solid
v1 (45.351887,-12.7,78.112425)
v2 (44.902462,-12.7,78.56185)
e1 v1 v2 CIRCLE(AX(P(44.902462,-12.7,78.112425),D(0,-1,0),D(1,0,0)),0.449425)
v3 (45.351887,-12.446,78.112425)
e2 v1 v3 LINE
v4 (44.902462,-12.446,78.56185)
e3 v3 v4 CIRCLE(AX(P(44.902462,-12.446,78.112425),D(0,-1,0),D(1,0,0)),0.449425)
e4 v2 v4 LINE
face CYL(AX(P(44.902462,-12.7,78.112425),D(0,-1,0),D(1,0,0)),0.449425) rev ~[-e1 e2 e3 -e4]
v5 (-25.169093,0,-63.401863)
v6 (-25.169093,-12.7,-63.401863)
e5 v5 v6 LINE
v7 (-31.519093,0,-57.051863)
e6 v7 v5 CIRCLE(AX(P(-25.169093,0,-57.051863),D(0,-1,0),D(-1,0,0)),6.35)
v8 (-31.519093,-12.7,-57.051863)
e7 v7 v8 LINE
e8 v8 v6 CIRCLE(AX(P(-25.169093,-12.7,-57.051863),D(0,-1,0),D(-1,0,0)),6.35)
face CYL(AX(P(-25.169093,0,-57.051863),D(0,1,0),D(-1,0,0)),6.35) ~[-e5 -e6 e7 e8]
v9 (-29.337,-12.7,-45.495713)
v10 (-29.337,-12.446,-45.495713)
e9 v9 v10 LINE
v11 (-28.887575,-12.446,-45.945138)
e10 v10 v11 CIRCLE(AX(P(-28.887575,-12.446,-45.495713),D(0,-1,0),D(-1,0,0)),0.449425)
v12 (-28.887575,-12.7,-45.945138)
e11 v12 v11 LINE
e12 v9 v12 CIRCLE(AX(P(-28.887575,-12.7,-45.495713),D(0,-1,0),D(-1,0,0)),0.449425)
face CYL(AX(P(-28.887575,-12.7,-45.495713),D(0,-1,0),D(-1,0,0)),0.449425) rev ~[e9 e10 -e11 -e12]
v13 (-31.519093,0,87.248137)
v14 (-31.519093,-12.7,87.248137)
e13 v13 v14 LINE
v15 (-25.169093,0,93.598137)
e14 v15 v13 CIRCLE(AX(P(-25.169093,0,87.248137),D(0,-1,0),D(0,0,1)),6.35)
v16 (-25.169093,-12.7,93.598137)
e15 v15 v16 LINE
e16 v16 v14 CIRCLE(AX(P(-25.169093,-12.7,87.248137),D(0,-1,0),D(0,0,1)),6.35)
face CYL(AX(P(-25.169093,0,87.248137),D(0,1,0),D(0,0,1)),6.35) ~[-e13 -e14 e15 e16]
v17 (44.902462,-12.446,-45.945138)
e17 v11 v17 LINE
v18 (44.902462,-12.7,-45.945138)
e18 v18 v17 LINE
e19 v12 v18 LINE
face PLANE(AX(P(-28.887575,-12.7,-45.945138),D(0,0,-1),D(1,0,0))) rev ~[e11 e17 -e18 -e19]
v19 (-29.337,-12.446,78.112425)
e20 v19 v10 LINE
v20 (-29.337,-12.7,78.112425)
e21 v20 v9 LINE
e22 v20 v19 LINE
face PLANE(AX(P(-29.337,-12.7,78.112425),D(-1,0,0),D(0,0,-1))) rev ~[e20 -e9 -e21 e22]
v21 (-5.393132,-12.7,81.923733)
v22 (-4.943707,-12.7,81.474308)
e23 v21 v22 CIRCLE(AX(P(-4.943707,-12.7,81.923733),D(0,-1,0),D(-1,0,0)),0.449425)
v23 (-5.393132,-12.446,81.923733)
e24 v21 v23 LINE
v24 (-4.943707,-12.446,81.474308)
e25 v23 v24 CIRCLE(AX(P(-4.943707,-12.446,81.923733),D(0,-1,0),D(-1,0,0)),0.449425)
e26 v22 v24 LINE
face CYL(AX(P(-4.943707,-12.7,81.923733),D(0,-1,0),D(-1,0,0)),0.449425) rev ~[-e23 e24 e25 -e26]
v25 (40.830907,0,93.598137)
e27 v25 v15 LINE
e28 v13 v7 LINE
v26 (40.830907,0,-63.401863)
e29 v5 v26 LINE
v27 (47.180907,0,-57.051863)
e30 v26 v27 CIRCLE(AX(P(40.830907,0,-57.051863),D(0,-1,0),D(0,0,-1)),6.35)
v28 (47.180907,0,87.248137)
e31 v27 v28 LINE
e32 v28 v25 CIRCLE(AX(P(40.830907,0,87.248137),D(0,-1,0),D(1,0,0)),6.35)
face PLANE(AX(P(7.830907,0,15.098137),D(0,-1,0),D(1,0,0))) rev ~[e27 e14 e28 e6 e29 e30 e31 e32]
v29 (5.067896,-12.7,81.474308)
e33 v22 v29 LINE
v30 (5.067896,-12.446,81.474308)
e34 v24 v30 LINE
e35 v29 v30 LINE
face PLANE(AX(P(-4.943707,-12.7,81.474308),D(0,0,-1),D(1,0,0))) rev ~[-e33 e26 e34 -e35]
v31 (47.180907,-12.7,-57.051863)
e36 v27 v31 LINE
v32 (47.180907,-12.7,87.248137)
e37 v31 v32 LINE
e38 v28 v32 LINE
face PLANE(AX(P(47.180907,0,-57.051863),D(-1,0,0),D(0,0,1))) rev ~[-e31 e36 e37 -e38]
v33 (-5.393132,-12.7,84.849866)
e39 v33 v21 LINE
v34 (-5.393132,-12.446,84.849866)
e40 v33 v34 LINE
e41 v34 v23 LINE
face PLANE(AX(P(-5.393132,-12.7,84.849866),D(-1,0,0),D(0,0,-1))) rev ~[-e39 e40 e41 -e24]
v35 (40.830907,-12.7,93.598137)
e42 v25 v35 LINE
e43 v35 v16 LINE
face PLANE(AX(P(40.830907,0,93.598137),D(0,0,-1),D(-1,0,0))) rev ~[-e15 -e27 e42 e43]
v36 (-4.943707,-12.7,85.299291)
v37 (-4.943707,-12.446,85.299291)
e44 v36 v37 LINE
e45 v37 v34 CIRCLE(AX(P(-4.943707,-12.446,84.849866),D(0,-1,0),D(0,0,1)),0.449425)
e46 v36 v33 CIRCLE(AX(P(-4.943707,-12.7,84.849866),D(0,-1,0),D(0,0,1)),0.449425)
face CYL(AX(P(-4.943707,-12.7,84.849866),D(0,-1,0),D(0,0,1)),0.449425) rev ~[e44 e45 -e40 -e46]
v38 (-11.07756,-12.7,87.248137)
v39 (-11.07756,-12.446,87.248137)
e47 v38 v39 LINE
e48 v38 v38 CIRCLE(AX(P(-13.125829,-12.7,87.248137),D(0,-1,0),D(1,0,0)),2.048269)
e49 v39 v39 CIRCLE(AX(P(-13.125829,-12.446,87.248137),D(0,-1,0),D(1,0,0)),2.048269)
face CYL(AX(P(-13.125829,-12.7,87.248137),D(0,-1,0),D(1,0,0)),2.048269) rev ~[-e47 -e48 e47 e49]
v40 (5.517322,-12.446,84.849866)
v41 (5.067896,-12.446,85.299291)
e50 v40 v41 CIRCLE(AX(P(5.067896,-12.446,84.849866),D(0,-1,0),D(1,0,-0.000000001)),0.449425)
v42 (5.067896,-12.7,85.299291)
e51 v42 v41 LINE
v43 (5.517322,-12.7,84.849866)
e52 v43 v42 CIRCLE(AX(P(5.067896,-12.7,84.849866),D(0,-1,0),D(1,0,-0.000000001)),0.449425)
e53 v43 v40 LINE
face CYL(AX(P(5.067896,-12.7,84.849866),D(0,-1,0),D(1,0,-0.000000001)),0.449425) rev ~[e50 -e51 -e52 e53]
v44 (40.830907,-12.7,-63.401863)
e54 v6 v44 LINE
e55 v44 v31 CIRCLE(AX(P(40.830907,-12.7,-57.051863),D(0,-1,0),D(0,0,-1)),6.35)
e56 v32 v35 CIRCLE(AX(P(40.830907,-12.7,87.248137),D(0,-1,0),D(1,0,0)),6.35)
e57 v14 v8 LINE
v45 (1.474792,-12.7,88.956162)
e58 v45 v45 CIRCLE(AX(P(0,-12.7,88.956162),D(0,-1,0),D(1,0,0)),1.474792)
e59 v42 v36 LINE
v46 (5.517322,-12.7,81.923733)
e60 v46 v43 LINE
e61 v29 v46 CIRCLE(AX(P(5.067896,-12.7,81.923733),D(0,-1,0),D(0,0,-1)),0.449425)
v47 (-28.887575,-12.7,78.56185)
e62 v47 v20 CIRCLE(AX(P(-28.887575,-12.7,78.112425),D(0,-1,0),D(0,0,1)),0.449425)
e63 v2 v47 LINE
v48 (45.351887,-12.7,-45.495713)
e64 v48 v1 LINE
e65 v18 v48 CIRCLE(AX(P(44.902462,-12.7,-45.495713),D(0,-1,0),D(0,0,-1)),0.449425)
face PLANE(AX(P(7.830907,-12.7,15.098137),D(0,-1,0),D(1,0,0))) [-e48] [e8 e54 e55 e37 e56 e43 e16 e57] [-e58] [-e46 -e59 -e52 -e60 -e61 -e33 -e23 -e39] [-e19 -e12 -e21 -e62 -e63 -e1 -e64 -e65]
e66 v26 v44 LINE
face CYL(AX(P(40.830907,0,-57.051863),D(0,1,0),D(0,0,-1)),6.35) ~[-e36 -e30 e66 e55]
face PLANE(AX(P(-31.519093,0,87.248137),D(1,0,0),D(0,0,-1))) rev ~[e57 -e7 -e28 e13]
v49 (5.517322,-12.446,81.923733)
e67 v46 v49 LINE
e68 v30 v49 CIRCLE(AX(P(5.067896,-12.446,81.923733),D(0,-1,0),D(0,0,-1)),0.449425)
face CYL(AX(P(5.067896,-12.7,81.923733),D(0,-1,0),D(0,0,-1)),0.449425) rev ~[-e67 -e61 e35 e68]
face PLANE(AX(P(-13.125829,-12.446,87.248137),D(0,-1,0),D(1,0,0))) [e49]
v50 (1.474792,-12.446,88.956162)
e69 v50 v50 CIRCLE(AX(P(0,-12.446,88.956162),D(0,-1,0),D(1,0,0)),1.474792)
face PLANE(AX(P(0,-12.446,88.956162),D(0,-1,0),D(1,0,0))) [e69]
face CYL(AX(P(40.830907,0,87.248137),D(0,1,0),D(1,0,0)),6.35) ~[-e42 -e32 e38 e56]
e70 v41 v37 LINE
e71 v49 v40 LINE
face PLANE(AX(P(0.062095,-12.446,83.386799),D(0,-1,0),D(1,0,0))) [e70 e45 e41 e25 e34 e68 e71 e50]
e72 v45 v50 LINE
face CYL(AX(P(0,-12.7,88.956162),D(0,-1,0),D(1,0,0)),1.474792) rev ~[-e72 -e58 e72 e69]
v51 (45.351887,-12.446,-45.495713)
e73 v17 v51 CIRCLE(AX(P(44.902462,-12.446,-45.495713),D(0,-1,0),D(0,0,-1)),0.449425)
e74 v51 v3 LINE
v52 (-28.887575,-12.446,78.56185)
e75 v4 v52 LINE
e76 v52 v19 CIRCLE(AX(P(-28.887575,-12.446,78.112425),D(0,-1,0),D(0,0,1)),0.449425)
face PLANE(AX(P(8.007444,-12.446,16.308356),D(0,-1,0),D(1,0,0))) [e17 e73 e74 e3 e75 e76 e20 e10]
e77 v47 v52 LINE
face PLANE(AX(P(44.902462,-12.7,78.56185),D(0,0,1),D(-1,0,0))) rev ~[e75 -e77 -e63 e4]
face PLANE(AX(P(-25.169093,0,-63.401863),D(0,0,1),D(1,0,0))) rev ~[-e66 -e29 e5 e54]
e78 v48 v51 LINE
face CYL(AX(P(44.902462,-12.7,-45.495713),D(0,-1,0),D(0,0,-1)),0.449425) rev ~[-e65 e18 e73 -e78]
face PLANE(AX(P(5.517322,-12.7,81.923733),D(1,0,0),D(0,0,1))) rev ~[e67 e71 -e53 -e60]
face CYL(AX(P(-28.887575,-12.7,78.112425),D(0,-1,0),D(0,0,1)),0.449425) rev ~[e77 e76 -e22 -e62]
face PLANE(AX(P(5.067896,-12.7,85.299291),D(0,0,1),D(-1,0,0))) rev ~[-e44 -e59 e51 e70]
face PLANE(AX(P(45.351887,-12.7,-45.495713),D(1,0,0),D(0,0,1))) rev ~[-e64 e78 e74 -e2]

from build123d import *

# Parameters (mm, degrees)
F1_DEPTH = 12.7
F2_R     = 2.048268854
F2_R_2   = 1.4747920456
F3_DEPTH = 0.254


# Not quite as in the source:
# - a feature names something its author has since deleted; it is built from what else it names
# - the program builds the solid bodies; features that only make, move or delete a surface that nothing else refers to are left out


with BuildPart() as f1:
    # F0 (on Front) → F1 (new body)
    with BuildSketch(Plane.XZ):
        with BuildLine():
            Line((40.8309073806, 93.5981370211), (-25.1690926194, 93.5981370211))
            ThreePointArc((-25.1690926194, 93.5981370211), (-29.65922068, 91.7382650816), (-31.5190926194, 87.2481370211))
            Line((-31.5190926194, 87.2481370211), (-31.5190926194, -57.0518629789))
            ThreePointArc((-31.5190926194, -57.0518629789), (-29.65922068, -61.5419910395), (-25.1690926194, -63.4018629789))
            Line((-25.1690926194, -63.4018629789), (40.8309073806, -63.4018629789))
            ThreePointArc((40.8309073806, -63.4018629789), (45.3210354411, -61.5419910395), (47.1809073806, -57.0518629789))
            Line((47.1809073806, -57.0518629789), (47.1809073806, 87.2481370211))
            ThreePointArc((47.1809073806, 87.2481370211), (45.3210354411, 91.7382650816), (40.8309073806, 93.5981370211))
        make_face()
    extrude(amount=F1_DEPTH)

    # F2 (on face) → F3 (cut)
    with BuildSketch(Plane.XZ.offset(12.7)):
        with Locations((-13.1258289722, 87.2481370211)):
            Circle(F2_R)
        with Locations((0, 88.9561623335)):
            Circle(F2_R_2)
        with BuildLine():
            Line((5.0678964471, 85.2992907166), (-4.9437066773, 85.2992907166))
            ThreePointArc((-4.9437066773, 85.2992907166), (-5.2614981956, 85.1676571598), (-5.3931317525, 84.8498656414))
            Line((-5.3931317525, 84.8498656414), (-5.3931317525, 81.9237329997))
            ThreePointArc((-5.3931317525, 81.9237329997), (-5.2614981956, 81.6059414814), (-4.9437066773, 81.4743079245))
            Line((-4.9437066773, 81.4743079245), (5.0678964471, 81.4743079245))
            ThreePointArc((5.0678964471, 81.4743079245), (5.3856879655, 81.6059414814), (5.5173215223, 81.9237329997))
            Line((5.5173215223, 81.9237329997), (5.5173215223, 84.8498656414))
            ThreePointArc((5.5173215223, 84.8498656414), (5.3856879655, 85.1676571598), (5.0678964471, 85.2992907166))
        make_face()
        with BuildLine():
            Line((44.9024620466, 78.5618498921), (-28.8875750266, 78.5618498921))
            ThreePointArc((-28.8875750266, 78.5618498921), (-29.2053665449, 78.4302163352), (-29.3370001018, 78.1124248169))
            Line((-29.3370001018, 78.1124248169), (-29.3370001018, -45.495712664))
            ThreePointArc((-29.3370001018, -45.495712664), (-29.2053665449, -45.8135041823), (-28.8875750266, -45.9451377392))
            Line((-28.8875750266, -45.9451377392), (44.9024620466, -45.9451377392))
            ThreePointArc((44.9024620466, -45.9451377392), (45.2202535649, -45.8135041823), (45.3518871218, -45.495712664))
            Line((45.3518871218, -45.495712664), (45.3518871218, 78.1124248169))
            ThreePointArc((45.3518871218, 78.1124248169), (45.2202535649, 78.4302163352), (44.9024620466, 78.5618498921))
        make_face()
    extrude(amount=-F3_DEPTH, mode=Mode.SUBTRACT)


solid = f1.part
